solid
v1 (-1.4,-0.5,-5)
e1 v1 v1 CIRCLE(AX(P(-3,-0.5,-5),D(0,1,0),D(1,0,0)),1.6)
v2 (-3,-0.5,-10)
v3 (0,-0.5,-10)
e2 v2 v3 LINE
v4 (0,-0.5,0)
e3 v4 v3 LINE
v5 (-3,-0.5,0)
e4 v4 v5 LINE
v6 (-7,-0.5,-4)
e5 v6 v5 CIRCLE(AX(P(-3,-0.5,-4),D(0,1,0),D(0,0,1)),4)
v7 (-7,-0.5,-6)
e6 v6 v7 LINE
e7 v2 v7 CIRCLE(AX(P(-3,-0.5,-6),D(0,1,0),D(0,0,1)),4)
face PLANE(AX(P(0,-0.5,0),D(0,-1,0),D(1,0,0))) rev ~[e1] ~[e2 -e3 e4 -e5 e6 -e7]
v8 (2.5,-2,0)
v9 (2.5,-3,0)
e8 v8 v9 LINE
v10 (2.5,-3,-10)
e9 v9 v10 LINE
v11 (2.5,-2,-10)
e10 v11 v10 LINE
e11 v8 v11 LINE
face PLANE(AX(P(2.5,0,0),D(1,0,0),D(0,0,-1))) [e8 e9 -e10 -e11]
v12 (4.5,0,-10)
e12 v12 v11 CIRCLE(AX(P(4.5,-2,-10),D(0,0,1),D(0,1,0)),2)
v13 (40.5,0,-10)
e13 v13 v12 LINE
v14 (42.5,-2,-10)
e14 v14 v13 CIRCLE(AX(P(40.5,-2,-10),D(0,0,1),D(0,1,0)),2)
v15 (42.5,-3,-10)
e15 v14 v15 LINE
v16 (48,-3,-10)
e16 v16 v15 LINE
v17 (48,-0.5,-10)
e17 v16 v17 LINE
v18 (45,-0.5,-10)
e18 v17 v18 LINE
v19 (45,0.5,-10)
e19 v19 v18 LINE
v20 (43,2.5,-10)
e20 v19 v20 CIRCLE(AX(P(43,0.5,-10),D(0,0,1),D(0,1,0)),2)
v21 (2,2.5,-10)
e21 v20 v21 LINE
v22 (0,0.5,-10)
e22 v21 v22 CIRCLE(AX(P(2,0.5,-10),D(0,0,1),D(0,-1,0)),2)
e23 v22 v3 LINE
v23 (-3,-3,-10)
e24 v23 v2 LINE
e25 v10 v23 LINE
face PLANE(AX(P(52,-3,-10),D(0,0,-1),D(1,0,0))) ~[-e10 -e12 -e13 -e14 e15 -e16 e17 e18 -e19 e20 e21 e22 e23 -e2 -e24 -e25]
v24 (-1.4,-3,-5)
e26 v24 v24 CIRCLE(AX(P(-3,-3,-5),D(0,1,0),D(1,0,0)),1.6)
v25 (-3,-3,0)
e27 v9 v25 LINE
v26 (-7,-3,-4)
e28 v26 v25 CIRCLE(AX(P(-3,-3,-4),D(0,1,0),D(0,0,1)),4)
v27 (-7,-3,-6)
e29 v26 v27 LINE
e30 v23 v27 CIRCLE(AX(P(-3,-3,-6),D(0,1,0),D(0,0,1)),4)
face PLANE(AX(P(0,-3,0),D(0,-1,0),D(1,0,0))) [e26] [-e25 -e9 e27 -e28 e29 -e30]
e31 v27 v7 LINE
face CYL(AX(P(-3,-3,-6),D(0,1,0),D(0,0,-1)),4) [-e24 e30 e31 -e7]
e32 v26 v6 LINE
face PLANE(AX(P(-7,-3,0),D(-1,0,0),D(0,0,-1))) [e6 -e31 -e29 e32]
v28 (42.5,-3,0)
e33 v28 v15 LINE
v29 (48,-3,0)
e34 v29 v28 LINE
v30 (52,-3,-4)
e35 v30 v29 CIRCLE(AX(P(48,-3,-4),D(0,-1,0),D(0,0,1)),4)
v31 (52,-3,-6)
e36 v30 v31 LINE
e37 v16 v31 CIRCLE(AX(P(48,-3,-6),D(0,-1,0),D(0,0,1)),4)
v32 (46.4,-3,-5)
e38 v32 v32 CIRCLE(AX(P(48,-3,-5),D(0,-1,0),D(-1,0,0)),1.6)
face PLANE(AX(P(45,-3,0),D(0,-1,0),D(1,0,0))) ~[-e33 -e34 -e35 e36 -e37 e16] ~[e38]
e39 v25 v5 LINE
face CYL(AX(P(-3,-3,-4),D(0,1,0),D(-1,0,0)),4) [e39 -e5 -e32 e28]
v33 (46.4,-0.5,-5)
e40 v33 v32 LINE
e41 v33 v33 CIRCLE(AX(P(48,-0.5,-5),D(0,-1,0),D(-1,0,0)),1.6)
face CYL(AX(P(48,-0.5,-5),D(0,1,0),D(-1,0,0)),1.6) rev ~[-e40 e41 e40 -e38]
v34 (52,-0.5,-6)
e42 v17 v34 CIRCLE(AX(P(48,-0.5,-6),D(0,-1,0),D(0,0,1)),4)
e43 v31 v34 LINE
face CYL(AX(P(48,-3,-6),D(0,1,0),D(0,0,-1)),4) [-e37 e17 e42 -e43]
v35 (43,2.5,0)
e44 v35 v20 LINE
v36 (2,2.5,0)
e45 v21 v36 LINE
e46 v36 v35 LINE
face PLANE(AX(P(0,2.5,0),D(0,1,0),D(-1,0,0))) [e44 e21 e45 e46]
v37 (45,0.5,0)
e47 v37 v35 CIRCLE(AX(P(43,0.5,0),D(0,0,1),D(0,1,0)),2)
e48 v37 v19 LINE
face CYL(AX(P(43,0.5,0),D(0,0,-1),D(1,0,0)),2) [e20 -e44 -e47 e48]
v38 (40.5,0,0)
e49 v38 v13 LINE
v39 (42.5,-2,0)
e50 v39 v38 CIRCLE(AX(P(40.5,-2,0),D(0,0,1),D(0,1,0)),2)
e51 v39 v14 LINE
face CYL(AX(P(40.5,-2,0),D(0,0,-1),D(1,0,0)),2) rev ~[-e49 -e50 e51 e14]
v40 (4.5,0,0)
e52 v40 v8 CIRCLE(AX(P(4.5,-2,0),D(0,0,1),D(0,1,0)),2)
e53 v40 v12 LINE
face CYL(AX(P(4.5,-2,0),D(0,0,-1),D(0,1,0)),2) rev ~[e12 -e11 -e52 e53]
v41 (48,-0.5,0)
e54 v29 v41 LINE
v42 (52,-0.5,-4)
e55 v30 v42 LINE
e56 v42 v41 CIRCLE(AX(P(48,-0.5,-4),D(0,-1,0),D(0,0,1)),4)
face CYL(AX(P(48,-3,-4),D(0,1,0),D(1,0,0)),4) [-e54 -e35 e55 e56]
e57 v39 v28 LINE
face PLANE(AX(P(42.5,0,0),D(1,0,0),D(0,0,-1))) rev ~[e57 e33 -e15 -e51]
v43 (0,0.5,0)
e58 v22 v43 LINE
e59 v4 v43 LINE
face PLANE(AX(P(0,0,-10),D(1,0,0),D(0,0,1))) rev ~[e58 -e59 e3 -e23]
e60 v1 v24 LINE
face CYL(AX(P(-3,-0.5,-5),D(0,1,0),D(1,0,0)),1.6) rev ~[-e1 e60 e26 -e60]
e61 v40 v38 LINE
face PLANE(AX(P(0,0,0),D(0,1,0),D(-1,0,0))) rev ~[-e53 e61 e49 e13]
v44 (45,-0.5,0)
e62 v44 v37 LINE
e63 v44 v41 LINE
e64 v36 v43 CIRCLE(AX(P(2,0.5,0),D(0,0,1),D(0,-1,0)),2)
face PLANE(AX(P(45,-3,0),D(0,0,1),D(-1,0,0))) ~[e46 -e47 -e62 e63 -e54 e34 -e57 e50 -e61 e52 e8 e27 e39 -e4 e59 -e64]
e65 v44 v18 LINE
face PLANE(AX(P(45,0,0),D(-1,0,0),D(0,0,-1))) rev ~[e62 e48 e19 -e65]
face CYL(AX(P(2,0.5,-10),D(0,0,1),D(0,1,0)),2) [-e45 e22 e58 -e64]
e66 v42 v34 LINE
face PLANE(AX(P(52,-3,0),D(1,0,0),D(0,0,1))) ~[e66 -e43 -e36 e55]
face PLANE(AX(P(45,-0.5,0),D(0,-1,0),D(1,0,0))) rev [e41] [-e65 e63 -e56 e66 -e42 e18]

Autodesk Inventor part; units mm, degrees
ref_plane "YZ Plane" through (0, 0, 0) normal (1, 0, 0) x (0, 1, 0)
ref_plane "XZ Plane" through (0, 0, 0) normal (0, 1, 0) x (-1, 0, 0)
sketch "Sketch1" plane through (0, 0, 0) normal (0, 1, 0) x (-1, 0, 0)
  line L0 (0, 0) -> (-45, 0)
  line L1 (-45, 0) -> (-45, -10)
  line L2 (-45, -10) -> (0, -10)
  line L3 (0, -10) -> (0, 0)
  dimension "d0" = 10
  dimension "d1" = 45
extrude "Extrusion1" add sketch "Sketch1" along normal blind 2.5
sketch "Sketch2" plane through (0, 0, 0) normal (0, -1, 0) x (1, 0, 0)
  line L0 (0, 0) -> (45, 0) projected
  line L1 (0, -10) -> (0, 0) projected
  line L2 (45, -10) -> (0, -10) projected
  line L3 (45, 0) -> (45, -10) projected
  line L4 (0, 0) -> (45, 0) projected
  line L5 (2.5, 0) -> (2.5, -10)
  line L6 (42.5, 0) -> (42.5, -10)
  line L7 (45, -10) -> (0, -10) projected
  dimension "d4" = 2.5
  dimension "d5" = 2.5
extrude "Extrusion2" add sketch "Sketch2" along normal blind 3 contours L0 L5 L2 L1 | L0 L3 L2 L6
sketch "Sketch3" plane through (0, -3, 0) normal (0, -1, 0) x (1, 0, 0)
  line L0 (0, -10) -> (2.5, -10) projected
  line L1 (2.5, -10) -> (2.5, 0) projected
  line L2 (2.5, 0) -> (0, 0) projected
  line L3 (0, 0) -> (0, -10) projected
  line L4 (0, 0) -> (-7, 0)
  line L5 (-7, 0) -> (-7, -10)
  line L6 (-7, -10) -> (0, -10)
  line L7 (0, -10) -> (0, 0)
  line L8 (0, -10) -> (2.5, -10) projected
  dimension "d8" = 7
extrude "Extrusion3" add sketch "Sketch3" against normal blind 2.5 contours L6 L5 L4 L3
sketch "Sketch4" plane through (0, -0.5, 0) normal (0, 1, 0) x (1, 0, 0)
  line L0 (-7, 0) -> (0, 0) projected
  line L1 (0, 10) -> (0, 0) projected
  line L2 (0, 10) -> (-7, 10) projected
  line L3 (-7, 10) -> (-7, 0) projected
  line L4 (0, 10) -> (0, 0) construction
  line L5 (0, 5) -> (-3, 5) construction
  circle A0 centre (-3, 5) radius 1.6
  dimension "d11" = 3
  dimension "d12" = 3.2
extrude "Extrusion4" cut sketch "Sketch4" against normal up to surface (2.5 mm away) contours A0
ref_plane "Work Plane1" through (22.5, 0, 0) normal (1, 0, 0) x (0, 0, -1)
fillet "Fillet1" radius 4 2 edges at (-7, -1.75, 0) (-7, -1.75, -10)
mirror "Mirror1" about plane through (22.5, 0, 0) normal (1, 0, 0) of "Fillet1", "Extrusion4", "Extrusion3"
fillet "Fillet3" radius 2 4 edges at (2.5, 0, -5) (42.5, 0, -5) (0, 2.5, -5) (45, 2.5, -5)
equation "\"d2\" = wall_thickness"
equation "\"d4\" = wall_thickness"
equation "\"d5\" = wall_thickness"
equation "\"d9\" = wall_thickness"
equation "\"d13\" = wall_thickness"
equation "\"wall_thickness\" = 2.5"
properties part number "battery_mount_1s_500mah"
